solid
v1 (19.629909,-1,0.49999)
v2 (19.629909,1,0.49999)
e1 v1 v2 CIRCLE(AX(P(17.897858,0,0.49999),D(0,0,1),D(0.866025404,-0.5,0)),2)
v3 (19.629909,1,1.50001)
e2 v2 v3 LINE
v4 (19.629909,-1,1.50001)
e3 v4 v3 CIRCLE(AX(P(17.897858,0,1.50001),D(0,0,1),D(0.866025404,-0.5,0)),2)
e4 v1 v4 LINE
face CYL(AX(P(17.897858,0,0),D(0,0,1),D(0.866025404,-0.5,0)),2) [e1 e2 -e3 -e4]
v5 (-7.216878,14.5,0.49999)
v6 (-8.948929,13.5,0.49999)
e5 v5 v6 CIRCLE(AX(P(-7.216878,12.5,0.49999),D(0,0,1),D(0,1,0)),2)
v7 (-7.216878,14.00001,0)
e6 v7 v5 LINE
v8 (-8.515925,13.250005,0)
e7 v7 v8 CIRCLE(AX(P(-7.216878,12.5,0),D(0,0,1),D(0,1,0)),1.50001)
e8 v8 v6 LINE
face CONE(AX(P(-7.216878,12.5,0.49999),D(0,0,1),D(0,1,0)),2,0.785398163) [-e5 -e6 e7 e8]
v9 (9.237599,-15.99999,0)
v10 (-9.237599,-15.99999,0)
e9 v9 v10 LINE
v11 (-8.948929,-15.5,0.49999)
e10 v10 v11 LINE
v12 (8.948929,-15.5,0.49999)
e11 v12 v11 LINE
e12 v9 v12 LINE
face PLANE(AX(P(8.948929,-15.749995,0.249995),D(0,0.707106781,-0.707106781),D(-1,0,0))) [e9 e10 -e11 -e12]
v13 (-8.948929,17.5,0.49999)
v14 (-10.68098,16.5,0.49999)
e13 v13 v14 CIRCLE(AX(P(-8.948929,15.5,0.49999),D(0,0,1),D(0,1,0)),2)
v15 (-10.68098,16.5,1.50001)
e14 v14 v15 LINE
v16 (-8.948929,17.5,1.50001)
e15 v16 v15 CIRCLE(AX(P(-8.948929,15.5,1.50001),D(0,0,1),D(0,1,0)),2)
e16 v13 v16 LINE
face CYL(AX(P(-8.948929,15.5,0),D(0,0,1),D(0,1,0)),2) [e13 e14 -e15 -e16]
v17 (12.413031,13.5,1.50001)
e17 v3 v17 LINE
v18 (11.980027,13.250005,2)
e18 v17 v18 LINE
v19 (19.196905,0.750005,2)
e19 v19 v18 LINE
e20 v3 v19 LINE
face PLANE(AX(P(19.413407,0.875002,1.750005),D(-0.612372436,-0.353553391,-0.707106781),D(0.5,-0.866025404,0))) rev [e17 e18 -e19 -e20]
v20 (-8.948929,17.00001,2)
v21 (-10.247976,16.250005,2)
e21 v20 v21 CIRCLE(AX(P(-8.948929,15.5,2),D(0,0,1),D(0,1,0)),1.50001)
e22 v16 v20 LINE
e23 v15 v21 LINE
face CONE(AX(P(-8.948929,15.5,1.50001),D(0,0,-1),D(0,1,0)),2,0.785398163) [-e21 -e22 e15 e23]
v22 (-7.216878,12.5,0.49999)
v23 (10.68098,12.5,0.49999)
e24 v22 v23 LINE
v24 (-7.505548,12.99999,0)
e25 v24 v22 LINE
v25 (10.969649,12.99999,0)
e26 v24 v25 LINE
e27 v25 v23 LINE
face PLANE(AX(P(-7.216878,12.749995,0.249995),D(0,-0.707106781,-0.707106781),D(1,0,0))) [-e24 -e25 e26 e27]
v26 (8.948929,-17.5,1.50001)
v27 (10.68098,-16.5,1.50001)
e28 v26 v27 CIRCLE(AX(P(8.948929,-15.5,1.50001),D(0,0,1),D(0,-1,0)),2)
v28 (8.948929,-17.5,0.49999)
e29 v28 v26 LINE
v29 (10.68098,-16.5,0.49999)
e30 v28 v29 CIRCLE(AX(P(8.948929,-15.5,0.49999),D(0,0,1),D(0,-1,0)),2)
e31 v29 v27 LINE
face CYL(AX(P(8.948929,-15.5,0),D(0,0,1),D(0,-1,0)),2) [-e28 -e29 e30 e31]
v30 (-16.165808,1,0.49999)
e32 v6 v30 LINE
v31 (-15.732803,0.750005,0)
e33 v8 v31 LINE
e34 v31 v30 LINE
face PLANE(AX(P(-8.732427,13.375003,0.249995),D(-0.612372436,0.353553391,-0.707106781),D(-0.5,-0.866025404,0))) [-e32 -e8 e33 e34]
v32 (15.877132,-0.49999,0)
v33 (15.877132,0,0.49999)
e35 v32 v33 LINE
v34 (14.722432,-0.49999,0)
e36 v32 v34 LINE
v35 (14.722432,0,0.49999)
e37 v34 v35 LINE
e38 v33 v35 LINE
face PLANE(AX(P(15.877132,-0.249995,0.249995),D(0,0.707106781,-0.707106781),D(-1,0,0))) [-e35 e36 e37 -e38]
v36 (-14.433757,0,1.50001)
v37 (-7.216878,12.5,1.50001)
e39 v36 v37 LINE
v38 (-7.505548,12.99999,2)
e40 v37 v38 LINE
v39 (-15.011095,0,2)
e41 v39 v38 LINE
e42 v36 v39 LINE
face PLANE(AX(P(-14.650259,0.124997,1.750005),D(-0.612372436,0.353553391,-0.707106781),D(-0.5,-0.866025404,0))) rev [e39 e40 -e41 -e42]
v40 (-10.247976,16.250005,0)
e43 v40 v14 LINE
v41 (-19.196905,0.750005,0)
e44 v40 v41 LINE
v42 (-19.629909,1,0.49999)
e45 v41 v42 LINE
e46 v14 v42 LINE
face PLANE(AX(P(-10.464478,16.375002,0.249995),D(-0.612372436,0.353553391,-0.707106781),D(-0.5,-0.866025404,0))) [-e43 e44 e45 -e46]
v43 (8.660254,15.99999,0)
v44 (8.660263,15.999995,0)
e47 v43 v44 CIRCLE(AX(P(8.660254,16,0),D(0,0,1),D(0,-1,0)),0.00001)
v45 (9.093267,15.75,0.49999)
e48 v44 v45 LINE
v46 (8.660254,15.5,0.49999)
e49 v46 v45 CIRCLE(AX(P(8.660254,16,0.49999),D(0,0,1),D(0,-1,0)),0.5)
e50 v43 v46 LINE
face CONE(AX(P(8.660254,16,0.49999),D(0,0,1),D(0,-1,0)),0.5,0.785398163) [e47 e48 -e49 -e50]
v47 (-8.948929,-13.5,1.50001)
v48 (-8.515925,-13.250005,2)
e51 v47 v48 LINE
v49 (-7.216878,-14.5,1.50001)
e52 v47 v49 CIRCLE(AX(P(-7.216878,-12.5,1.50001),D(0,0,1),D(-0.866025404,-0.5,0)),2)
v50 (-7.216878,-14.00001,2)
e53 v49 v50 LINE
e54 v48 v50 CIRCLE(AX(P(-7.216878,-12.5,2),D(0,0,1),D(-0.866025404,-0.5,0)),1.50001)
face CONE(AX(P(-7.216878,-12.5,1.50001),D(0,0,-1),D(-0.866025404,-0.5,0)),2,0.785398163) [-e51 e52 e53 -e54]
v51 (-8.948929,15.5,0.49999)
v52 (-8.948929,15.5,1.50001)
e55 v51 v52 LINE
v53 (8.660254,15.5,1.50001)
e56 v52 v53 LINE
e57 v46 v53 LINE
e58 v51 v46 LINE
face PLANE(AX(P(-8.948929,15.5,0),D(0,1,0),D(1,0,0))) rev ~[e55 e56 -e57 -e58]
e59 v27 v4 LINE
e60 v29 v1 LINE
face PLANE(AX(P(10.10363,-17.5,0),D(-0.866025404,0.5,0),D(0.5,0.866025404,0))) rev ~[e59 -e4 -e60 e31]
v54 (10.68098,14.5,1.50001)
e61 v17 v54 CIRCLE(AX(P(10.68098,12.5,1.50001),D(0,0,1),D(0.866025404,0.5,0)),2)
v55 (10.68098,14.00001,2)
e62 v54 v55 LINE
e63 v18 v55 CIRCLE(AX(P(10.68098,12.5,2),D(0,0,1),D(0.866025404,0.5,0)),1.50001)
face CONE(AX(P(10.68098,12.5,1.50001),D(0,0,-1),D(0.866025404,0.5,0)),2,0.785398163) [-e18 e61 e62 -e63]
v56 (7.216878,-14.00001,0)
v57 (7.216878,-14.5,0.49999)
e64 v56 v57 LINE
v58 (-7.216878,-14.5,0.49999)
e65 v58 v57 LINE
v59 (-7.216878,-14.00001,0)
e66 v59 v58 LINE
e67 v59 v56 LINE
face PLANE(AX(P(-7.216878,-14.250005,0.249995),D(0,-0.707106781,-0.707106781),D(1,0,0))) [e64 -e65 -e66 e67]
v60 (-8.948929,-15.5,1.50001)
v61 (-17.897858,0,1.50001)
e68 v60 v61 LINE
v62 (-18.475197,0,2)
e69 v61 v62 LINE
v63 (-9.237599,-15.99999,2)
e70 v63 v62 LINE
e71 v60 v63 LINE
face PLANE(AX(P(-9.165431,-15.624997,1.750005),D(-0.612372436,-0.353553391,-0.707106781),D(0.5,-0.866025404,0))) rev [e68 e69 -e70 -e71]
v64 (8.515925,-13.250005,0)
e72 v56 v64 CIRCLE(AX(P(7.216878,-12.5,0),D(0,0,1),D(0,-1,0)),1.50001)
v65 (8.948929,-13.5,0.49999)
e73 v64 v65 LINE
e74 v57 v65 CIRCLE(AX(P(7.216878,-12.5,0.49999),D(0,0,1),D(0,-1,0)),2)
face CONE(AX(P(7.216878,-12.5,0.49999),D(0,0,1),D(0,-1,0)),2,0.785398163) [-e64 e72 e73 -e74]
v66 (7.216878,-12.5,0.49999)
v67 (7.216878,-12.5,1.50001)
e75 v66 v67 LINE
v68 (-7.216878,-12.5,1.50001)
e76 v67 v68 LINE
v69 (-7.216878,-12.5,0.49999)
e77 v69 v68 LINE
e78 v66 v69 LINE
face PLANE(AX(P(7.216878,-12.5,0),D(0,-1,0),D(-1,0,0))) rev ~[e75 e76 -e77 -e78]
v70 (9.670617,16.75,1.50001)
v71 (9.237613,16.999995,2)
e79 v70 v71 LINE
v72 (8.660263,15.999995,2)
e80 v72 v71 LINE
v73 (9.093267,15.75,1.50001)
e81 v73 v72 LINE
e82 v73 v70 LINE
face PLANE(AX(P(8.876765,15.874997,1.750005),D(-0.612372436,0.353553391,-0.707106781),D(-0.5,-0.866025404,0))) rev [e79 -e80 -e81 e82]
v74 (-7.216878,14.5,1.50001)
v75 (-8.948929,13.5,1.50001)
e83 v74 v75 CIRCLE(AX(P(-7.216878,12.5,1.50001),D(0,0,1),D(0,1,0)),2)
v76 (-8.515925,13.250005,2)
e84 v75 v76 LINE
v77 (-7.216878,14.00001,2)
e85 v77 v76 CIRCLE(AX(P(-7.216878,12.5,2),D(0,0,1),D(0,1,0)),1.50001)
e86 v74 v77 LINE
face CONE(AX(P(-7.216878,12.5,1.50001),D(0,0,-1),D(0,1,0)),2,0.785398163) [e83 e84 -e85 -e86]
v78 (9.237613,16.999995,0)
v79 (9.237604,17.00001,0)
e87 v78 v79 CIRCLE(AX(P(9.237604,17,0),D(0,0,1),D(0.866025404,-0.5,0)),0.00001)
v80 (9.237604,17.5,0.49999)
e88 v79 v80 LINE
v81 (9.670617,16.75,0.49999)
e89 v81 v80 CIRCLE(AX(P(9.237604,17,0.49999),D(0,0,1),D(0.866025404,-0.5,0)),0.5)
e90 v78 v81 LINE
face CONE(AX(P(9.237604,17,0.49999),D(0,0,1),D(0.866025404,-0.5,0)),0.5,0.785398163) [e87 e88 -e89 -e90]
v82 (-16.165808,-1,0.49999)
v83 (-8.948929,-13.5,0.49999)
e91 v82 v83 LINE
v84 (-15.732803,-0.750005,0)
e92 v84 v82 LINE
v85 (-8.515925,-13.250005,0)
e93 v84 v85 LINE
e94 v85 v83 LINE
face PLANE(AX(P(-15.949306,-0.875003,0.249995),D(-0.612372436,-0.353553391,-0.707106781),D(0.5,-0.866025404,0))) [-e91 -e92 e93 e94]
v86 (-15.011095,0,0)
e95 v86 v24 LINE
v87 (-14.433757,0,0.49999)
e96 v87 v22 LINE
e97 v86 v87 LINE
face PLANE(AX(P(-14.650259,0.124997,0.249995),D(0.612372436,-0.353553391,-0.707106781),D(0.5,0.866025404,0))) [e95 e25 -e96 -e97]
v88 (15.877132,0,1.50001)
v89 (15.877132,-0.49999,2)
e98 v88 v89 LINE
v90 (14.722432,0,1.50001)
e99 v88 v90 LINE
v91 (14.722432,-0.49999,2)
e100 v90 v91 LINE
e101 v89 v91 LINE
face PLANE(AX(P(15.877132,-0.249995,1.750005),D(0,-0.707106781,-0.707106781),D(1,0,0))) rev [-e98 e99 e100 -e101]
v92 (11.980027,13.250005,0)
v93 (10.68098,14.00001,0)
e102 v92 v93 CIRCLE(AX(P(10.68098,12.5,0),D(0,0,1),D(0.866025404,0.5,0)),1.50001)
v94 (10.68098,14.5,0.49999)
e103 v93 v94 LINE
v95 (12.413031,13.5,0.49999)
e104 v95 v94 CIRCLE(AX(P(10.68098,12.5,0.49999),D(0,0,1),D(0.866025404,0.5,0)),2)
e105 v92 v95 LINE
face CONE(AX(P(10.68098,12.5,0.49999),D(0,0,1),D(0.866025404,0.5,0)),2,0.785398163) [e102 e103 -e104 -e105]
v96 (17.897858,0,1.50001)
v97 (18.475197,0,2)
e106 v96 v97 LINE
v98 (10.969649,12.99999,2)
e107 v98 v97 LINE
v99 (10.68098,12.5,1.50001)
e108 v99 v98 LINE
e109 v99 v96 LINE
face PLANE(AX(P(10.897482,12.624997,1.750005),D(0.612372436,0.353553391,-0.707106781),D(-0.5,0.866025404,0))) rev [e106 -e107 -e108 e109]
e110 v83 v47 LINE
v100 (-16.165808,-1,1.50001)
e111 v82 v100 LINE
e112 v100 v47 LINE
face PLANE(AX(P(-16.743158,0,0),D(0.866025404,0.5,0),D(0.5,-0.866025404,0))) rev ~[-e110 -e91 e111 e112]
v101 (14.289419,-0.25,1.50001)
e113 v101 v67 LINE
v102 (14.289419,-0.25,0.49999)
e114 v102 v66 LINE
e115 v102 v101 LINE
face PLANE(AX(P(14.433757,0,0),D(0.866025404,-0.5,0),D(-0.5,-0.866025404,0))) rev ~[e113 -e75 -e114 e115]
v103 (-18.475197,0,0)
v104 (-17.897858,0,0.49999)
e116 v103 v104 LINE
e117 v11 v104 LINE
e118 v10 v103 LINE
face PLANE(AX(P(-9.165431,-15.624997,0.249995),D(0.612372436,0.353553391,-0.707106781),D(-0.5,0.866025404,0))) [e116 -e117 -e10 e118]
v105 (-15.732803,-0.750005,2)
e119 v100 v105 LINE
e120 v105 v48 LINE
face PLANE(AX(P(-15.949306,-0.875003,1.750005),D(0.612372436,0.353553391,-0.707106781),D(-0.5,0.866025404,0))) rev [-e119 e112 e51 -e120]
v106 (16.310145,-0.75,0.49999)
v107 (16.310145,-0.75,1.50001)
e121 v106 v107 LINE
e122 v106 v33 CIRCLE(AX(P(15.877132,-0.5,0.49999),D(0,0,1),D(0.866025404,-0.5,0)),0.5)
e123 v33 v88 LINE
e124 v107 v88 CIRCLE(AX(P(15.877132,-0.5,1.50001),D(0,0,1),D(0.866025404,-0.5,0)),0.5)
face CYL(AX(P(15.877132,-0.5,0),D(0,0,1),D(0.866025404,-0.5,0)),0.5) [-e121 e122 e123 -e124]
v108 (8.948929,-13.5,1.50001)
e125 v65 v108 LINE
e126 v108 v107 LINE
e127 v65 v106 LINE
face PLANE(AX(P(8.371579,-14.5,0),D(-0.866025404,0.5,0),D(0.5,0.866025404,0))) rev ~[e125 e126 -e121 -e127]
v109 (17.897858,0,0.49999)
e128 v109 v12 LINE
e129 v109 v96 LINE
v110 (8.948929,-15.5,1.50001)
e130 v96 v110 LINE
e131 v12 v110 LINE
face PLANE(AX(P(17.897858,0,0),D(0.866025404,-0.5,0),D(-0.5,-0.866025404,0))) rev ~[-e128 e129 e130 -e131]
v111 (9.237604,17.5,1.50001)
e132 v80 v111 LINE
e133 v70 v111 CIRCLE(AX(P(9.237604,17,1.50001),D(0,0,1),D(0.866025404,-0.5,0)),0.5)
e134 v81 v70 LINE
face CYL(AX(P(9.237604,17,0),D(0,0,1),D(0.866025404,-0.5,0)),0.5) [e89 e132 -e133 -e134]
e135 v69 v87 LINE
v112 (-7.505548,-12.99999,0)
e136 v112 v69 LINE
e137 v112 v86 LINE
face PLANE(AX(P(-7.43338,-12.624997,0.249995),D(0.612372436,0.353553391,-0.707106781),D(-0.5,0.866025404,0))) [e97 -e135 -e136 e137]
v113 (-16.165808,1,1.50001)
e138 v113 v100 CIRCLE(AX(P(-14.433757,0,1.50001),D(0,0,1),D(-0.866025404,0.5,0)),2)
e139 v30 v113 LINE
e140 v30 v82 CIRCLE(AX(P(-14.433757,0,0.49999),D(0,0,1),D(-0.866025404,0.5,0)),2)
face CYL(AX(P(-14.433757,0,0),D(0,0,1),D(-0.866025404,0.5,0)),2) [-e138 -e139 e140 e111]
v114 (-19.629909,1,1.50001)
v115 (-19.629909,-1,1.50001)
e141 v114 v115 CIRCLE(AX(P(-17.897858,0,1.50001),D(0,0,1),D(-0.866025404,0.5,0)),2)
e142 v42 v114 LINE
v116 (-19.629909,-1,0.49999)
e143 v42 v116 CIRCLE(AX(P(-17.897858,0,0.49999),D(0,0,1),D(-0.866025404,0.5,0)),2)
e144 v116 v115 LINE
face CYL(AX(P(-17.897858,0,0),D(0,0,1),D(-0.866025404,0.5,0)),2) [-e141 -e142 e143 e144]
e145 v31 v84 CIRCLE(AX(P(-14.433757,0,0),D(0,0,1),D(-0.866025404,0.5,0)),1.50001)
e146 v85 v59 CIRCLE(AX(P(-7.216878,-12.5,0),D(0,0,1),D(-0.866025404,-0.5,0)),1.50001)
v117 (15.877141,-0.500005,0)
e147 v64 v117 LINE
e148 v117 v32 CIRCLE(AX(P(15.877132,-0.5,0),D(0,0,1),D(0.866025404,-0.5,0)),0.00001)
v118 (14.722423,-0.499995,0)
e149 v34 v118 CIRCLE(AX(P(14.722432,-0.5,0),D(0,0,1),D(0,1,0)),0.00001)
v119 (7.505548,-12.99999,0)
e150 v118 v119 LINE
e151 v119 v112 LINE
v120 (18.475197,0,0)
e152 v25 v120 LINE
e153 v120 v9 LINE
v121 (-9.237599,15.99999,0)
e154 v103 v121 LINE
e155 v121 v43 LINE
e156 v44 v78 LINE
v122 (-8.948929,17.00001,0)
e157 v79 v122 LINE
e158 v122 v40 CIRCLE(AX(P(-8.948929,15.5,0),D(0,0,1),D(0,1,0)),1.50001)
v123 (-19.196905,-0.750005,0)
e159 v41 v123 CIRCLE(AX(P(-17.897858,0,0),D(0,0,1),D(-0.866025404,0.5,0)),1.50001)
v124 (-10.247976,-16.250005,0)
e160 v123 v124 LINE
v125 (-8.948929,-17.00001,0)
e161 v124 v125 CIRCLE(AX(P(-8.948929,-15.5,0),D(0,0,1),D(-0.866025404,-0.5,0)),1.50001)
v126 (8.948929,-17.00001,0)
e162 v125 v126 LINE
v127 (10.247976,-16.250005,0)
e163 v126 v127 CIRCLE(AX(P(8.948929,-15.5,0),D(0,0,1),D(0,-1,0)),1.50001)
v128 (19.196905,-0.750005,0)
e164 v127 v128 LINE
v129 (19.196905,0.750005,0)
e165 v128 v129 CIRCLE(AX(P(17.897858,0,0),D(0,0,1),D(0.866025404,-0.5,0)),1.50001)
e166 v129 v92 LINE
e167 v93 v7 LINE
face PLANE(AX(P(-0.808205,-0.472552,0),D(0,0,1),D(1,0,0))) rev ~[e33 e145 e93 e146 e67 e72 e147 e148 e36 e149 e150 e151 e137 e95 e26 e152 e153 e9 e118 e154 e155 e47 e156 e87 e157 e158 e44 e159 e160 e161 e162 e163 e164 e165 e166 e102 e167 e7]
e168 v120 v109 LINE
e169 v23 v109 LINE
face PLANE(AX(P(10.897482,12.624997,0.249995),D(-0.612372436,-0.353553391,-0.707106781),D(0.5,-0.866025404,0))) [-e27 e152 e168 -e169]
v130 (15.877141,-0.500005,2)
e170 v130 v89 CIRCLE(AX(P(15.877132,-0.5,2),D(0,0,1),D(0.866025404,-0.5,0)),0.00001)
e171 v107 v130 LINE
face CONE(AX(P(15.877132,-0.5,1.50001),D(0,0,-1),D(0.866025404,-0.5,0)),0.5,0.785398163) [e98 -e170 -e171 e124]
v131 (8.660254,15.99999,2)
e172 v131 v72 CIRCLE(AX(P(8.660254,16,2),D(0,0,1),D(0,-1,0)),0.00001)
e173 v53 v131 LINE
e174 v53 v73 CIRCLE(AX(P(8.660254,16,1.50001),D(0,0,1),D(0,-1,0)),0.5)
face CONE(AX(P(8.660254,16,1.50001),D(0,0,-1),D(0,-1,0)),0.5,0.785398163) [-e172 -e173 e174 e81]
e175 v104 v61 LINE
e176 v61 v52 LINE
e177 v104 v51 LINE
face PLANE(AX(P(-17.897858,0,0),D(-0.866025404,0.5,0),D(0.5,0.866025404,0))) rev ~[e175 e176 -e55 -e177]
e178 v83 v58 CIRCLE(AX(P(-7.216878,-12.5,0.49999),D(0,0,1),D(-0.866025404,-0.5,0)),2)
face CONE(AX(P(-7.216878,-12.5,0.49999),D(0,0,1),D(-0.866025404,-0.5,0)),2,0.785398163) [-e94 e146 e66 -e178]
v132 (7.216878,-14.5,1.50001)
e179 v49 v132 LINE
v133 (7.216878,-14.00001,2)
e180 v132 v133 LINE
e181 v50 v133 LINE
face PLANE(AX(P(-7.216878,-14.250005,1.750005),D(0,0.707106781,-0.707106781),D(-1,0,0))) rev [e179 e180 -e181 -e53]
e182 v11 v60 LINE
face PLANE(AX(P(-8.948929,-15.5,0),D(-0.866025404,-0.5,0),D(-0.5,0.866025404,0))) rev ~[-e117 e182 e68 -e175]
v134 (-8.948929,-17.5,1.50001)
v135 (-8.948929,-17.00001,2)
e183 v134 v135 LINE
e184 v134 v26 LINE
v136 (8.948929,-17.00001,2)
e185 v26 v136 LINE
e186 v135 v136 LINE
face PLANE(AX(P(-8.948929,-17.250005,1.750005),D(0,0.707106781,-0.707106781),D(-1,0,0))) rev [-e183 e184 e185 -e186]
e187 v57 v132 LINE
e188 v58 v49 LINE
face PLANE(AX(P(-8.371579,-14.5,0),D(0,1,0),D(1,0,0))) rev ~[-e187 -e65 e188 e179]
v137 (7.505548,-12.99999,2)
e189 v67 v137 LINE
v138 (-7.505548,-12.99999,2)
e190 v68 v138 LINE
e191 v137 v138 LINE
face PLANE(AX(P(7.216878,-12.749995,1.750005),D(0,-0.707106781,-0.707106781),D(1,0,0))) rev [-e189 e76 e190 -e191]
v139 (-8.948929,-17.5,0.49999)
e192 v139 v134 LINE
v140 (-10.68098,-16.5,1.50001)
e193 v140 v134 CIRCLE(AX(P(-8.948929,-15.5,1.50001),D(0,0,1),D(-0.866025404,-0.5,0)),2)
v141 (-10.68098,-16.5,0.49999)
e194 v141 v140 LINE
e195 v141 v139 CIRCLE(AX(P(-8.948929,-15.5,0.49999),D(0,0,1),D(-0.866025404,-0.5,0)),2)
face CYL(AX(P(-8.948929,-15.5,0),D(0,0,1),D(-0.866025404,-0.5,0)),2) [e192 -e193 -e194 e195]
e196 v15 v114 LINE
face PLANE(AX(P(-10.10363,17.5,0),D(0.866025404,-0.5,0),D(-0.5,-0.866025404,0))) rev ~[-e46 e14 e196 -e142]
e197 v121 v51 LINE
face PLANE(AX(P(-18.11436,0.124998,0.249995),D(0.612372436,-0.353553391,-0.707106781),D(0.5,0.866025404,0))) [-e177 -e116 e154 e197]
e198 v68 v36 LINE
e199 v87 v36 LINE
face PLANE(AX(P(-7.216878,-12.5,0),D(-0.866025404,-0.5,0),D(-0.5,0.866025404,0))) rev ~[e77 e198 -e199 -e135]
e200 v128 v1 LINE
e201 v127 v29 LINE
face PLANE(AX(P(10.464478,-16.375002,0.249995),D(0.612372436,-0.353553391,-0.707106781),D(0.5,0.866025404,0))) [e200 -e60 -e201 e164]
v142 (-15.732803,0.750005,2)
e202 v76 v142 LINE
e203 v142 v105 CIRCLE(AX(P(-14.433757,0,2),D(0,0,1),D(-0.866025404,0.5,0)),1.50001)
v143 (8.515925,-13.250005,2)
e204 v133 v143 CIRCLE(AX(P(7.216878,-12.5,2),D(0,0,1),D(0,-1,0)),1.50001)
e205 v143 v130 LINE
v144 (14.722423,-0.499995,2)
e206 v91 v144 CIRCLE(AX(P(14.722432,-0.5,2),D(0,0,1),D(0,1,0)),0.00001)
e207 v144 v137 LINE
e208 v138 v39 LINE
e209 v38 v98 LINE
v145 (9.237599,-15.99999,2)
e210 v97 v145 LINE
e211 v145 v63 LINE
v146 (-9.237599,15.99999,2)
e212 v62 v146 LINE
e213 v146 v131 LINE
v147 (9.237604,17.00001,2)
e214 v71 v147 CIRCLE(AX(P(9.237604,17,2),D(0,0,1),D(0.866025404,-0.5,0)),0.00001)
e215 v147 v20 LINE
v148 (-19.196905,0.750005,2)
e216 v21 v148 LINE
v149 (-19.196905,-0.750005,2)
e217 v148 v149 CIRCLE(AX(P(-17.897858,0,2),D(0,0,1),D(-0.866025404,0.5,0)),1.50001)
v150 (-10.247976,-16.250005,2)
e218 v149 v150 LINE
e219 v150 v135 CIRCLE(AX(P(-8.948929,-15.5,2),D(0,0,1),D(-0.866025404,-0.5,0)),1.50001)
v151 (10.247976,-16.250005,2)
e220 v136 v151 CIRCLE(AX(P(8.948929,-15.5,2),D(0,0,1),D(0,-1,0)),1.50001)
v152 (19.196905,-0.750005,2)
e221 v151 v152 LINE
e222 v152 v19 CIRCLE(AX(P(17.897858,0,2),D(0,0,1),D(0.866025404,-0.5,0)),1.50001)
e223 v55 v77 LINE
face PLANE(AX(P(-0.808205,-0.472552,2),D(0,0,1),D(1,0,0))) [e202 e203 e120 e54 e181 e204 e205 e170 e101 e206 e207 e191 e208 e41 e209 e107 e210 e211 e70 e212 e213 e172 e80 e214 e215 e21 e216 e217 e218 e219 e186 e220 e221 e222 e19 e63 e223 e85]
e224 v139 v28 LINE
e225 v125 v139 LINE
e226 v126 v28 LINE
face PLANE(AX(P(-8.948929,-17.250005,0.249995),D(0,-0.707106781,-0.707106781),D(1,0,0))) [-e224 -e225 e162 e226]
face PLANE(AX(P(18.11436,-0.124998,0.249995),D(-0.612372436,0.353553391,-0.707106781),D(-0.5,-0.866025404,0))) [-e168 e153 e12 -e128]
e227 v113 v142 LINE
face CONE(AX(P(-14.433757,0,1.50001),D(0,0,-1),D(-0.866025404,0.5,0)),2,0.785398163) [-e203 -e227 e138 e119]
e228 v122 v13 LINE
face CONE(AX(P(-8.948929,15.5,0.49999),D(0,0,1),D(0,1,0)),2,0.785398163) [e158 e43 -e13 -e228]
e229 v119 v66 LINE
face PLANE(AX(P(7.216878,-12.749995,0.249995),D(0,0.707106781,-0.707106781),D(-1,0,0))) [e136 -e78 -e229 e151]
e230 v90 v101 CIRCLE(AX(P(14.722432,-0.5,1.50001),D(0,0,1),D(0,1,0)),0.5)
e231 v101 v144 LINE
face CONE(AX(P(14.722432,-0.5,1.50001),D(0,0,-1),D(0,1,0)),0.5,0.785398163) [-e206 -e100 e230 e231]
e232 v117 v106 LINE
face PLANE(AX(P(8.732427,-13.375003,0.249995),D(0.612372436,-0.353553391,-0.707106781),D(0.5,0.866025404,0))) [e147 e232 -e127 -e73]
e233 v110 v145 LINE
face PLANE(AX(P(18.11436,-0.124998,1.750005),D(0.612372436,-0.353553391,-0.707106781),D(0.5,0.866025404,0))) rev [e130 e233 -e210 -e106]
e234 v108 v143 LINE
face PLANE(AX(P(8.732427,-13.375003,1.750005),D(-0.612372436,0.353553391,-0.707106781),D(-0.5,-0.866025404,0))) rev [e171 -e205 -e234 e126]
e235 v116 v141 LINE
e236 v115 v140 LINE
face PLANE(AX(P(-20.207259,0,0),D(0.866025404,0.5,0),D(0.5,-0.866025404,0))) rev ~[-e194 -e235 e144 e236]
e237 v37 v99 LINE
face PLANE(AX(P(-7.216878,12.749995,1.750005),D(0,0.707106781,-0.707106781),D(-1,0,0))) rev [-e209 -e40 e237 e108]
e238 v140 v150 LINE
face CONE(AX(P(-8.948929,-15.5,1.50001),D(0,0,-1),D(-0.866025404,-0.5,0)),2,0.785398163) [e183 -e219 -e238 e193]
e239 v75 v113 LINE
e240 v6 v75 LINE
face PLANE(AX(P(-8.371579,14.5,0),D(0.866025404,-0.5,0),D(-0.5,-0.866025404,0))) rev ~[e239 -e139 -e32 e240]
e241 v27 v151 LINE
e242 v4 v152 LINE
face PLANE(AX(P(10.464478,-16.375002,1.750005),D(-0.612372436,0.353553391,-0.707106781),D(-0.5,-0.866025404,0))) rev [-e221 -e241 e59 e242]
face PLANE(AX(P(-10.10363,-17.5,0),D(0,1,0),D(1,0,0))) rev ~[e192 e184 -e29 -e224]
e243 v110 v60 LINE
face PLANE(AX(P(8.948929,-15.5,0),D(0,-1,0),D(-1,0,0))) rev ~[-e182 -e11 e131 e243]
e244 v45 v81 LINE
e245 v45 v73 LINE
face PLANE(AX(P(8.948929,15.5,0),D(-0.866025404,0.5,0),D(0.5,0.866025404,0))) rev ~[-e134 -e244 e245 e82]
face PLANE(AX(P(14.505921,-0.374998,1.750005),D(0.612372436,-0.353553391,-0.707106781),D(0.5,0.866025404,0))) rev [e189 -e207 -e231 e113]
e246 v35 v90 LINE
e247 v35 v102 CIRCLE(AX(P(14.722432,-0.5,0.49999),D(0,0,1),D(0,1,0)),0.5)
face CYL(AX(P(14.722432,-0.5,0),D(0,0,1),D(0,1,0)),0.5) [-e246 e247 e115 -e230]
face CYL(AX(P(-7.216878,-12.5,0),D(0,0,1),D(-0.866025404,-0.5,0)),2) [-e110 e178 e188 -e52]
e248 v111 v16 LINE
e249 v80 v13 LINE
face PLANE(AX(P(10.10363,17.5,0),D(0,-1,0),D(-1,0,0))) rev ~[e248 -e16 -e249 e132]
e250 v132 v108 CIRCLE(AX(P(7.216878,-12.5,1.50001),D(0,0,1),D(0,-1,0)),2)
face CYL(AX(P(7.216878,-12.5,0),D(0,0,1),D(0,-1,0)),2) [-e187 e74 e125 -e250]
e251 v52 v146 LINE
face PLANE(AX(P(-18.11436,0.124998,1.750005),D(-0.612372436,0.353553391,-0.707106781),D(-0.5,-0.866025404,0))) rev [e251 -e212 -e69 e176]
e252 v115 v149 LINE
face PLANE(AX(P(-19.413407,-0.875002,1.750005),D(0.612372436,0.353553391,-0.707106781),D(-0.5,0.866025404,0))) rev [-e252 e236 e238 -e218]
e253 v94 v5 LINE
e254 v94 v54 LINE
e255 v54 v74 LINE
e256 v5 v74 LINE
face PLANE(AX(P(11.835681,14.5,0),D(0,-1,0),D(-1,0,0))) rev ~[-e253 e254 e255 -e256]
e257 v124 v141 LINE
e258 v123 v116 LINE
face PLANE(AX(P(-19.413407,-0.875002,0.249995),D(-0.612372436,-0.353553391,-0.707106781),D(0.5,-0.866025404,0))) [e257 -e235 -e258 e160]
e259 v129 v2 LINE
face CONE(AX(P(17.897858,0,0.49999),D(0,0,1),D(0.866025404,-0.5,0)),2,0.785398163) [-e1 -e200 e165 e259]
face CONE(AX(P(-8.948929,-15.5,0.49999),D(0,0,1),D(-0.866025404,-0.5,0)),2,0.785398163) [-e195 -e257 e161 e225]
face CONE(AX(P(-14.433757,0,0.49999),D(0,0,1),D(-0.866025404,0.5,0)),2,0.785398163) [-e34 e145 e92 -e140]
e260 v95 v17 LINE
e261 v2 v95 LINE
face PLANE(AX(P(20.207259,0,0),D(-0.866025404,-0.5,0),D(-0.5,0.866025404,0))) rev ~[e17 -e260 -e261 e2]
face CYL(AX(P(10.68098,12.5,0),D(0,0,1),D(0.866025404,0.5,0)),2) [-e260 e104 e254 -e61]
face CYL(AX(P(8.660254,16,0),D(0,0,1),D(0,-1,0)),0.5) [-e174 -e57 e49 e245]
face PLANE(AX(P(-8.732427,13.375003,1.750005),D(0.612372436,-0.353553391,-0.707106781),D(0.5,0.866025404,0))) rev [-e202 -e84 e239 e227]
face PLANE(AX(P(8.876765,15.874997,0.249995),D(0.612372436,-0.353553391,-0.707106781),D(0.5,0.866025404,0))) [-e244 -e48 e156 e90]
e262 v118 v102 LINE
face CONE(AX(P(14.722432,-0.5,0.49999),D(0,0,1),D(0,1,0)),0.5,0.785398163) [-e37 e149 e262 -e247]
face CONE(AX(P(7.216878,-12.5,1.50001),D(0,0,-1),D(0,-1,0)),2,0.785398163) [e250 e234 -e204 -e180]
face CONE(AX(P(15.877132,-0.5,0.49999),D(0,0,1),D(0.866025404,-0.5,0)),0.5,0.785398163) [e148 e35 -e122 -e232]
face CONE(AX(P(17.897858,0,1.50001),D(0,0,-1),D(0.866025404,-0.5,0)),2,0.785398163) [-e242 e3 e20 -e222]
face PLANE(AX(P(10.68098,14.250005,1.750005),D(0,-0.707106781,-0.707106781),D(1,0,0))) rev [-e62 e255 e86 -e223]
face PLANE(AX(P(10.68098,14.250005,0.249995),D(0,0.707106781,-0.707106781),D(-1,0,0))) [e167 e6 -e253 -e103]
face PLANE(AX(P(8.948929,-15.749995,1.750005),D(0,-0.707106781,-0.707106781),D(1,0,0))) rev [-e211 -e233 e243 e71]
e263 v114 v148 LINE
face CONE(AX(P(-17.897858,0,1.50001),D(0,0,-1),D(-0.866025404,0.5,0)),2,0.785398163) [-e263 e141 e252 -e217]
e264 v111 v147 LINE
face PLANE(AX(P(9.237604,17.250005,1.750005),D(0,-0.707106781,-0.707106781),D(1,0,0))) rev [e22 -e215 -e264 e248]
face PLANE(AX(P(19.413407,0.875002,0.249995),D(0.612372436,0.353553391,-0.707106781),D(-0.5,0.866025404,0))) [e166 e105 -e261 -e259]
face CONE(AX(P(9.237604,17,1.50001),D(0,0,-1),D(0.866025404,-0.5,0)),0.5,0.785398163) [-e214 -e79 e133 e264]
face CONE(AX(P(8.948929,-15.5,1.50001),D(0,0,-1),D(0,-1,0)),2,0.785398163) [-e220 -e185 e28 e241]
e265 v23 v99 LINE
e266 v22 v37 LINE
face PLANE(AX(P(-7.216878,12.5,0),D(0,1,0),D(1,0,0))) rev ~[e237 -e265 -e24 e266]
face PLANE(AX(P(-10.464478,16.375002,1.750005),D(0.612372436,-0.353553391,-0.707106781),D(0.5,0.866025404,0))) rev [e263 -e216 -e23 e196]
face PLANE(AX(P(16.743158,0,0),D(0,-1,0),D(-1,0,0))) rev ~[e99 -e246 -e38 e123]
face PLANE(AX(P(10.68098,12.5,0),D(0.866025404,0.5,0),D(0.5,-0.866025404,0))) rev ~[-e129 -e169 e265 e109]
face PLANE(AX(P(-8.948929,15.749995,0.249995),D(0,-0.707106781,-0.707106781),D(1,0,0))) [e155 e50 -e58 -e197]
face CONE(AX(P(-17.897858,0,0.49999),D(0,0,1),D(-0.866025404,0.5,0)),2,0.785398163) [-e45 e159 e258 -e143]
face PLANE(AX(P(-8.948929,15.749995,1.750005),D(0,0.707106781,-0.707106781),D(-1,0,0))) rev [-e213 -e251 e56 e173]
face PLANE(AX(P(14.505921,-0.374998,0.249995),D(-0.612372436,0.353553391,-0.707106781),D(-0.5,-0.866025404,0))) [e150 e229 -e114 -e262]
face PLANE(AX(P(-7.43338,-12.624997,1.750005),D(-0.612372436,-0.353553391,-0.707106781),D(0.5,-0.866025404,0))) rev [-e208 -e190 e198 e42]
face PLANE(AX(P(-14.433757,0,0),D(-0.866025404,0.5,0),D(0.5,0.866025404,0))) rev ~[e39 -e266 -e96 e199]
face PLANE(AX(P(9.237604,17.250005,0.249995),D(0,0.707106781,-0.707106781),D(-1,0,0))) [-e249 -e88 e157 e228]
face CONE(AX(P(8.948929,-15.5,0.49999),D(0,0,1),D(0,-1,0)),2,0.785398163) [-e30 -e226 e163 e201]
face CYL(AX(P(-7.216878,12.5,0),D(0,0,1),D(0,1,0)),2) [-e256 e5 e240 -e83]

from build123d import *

# Parameters (mm, degrees)
F1_DEPTH = 2
F2_R     = 0.5
F3_R     = 2
F4_SIZE  = 0.49999


# Not quite as in the source:
# - a fillet or chamfer is up to 0.001 mm smaller than in the source, because OpenCascade refuses the exact size


with BuildPart() as f1:
    # F0 (on Top) → F1 (new body)
    with BuildSketch(Plane.XY):
        Polygon((-14.4337567297, 0), (-7.2168783649, 12.5), (7.2168783649, 12.5), (9.5262794416, 12.5), (10.68097998, 12.5), (17.8978583449, 0), (8.9489291724, -15.5), (-8.9489291724, -15.5), (-17.8978583449, 0), (-8.9489291724, 15.5), (8.9489291724, 15.5), (10.1036297108, 17.5), (-10.1036297108, 17.5), (-20.2072594216, 0), (-10.1036297108, -17.5), (10.1036297108, -17.5), (20.2072594216, 0), (11.8356805184, 14.5), (8.3715789032, 14.5), (-8.3715789032, 14.5), (-16.7431578065, 0), (-8.3715789032, -14.5), (8.3715789032, -14.5), (16.7431578065, 0), (14.4337567297, 0), (7.2168783649, -12.5), (-7.2168783649, -12.5), align=None)
    extrude(amount=F1_DEPTH)

    # F2
    f2_edges = [f1.edges().sort_by_distance(p)[0] for p in [
        (16.743158, 0, 1),
        (14.433757, 0, 1),
        (10.10363, 17.5, 1),
        (8.948929, 15.5, 1),
    ]]
    fillet(f2_edges, radius=F2_R)

    # F3
    f3_edges = [f1.edges().sort_by_distance(p)[0] for p in [
        (-10.10363, 17.5, 1),
        (-20.207259, 0, 1),
        (-10.10363, -17.5, 1),
        (10.10363, -17.5, 1),
        (20.207259, 0, 1),
        (11.835681, 14.5, 1),
        (-8.371579, 14.5, 1),
        (-16.743158, 0, 1),
        (-8.371579, -14.5, 1),
        (8.371579, -14.5, 1),
    ]]
    fillet(f3_edges, radius=F3_R)

    # F4 (size 0.5 in the source; OpenCascade refuses exactly that, so slightly less here)
    f4_edges = [f1.edges().sort_by_distance(p)[0] for p in [
        (12.629537, -7.125, 0),
        (8.216878, -14.232051, 0),
        (16.310145, -0.25, 0),
        (0, -14.5, 0),
        (15.299782, 0, 0),
        (-8.216878, -14.232051, 0),
        (14.472432, -0.066987, 0),
        (-12.557368, -7.25, 0),
        (10.753149, -6.375, 0),
        (-16.433757, 0, 0),
        (0, -12.5, 0),
        (-12.557368, 7.25, 0),
        (-10.825318, -6.25, 0),
        (-8.216878, 14.232051, 0),
        (-10.825318, 6.25, 0),
        (1.732051, 14.5, 0),
        (1.732051, 12.5, 0),
        (11.68098, 14.232051, 0),
        (14.289419, 6.25, 0),
        (16.02147, 7.25, 0),
        (13.423394, -7.75, 0),
        (19.897858, 0, 0),
        (0, -15.5, 0),
        (15.155445, -8.75, 0),
        (-13.423394, -7.75, 0),
        (9.948929, -17.232051, 0),
        (-13.423394, 7.75, 0),
        (0, -17.5, 0),
        (-0.144338, 15.5, 0),
        (-9.948929, -17.232051, 0),
        (8.910254, 15.566987, 0),
        (-15.155445, -8.75, 0),
        (9.381942, 16.25, 0),
        (-19.897858, 0, 0),
        (9.670617, 17.25, 0),
        (-15.155445, 8.75, 0),
        (0.144338, 17.5, 0),
        (-9.948929, 17.232051, 0),
        (12.629537, -7.125, 2),
        (8.216878, -14.232051, 2),
        (16.310145, -0.25, 2),
        (0, -14.5, 2),
        (15.299782, 0, 2),
        (-8.216878, -14.232051, 2),
        (14.472432, -0.066987, 2),
        (-12.557368, -7.25, 2),
        (10.753149, -6.375, 2),
        (-16.433757, 0, 2),
        (0, -12.5, 2),
        (-12.557368, 7.25, 2),
        (-10.825318, -6.25, 2),
        (-8.216878, 14.232051, 2),
        (-10.825318, 6.25, 2),
        (1.732051, 14.5, 2),
        (1.732051, 12.5, 2),
        (11.68098, 14.232051, 2),
        (14.289419, 6.25, 2),
        (16.02147, 7.25, 2),
        (13.423394, -7.75, 2),
        (19.897858, 0, 2),
        (0, -15.5, 2),
        (15.155445, -8.75, 2),
        (-13.423394, -7.75, 2),
        (9.948929, -17.232051, 2),
        (-13.423394, 7.75, 2),
        (0, -17.5, 2),
        (-0.144338, 15.5, 2),
        (-9.948929, -17.232051, 2),
        (8.910254, 15.566987, 2),
        (-15.155445, -8.75, 2),
        (9.381942, 16.25, 2),
        (-19.897858, 0, 2),
        (9.670617, 17.25, 2),
        (-15.155445, 8.75, 2),
        (0.144338, 17.5, 2),
        (-9.948929, 17.232051, 2),
    ]]
    chamfer(f4_edges, length=F4_SIZE)


solid = f1.part
